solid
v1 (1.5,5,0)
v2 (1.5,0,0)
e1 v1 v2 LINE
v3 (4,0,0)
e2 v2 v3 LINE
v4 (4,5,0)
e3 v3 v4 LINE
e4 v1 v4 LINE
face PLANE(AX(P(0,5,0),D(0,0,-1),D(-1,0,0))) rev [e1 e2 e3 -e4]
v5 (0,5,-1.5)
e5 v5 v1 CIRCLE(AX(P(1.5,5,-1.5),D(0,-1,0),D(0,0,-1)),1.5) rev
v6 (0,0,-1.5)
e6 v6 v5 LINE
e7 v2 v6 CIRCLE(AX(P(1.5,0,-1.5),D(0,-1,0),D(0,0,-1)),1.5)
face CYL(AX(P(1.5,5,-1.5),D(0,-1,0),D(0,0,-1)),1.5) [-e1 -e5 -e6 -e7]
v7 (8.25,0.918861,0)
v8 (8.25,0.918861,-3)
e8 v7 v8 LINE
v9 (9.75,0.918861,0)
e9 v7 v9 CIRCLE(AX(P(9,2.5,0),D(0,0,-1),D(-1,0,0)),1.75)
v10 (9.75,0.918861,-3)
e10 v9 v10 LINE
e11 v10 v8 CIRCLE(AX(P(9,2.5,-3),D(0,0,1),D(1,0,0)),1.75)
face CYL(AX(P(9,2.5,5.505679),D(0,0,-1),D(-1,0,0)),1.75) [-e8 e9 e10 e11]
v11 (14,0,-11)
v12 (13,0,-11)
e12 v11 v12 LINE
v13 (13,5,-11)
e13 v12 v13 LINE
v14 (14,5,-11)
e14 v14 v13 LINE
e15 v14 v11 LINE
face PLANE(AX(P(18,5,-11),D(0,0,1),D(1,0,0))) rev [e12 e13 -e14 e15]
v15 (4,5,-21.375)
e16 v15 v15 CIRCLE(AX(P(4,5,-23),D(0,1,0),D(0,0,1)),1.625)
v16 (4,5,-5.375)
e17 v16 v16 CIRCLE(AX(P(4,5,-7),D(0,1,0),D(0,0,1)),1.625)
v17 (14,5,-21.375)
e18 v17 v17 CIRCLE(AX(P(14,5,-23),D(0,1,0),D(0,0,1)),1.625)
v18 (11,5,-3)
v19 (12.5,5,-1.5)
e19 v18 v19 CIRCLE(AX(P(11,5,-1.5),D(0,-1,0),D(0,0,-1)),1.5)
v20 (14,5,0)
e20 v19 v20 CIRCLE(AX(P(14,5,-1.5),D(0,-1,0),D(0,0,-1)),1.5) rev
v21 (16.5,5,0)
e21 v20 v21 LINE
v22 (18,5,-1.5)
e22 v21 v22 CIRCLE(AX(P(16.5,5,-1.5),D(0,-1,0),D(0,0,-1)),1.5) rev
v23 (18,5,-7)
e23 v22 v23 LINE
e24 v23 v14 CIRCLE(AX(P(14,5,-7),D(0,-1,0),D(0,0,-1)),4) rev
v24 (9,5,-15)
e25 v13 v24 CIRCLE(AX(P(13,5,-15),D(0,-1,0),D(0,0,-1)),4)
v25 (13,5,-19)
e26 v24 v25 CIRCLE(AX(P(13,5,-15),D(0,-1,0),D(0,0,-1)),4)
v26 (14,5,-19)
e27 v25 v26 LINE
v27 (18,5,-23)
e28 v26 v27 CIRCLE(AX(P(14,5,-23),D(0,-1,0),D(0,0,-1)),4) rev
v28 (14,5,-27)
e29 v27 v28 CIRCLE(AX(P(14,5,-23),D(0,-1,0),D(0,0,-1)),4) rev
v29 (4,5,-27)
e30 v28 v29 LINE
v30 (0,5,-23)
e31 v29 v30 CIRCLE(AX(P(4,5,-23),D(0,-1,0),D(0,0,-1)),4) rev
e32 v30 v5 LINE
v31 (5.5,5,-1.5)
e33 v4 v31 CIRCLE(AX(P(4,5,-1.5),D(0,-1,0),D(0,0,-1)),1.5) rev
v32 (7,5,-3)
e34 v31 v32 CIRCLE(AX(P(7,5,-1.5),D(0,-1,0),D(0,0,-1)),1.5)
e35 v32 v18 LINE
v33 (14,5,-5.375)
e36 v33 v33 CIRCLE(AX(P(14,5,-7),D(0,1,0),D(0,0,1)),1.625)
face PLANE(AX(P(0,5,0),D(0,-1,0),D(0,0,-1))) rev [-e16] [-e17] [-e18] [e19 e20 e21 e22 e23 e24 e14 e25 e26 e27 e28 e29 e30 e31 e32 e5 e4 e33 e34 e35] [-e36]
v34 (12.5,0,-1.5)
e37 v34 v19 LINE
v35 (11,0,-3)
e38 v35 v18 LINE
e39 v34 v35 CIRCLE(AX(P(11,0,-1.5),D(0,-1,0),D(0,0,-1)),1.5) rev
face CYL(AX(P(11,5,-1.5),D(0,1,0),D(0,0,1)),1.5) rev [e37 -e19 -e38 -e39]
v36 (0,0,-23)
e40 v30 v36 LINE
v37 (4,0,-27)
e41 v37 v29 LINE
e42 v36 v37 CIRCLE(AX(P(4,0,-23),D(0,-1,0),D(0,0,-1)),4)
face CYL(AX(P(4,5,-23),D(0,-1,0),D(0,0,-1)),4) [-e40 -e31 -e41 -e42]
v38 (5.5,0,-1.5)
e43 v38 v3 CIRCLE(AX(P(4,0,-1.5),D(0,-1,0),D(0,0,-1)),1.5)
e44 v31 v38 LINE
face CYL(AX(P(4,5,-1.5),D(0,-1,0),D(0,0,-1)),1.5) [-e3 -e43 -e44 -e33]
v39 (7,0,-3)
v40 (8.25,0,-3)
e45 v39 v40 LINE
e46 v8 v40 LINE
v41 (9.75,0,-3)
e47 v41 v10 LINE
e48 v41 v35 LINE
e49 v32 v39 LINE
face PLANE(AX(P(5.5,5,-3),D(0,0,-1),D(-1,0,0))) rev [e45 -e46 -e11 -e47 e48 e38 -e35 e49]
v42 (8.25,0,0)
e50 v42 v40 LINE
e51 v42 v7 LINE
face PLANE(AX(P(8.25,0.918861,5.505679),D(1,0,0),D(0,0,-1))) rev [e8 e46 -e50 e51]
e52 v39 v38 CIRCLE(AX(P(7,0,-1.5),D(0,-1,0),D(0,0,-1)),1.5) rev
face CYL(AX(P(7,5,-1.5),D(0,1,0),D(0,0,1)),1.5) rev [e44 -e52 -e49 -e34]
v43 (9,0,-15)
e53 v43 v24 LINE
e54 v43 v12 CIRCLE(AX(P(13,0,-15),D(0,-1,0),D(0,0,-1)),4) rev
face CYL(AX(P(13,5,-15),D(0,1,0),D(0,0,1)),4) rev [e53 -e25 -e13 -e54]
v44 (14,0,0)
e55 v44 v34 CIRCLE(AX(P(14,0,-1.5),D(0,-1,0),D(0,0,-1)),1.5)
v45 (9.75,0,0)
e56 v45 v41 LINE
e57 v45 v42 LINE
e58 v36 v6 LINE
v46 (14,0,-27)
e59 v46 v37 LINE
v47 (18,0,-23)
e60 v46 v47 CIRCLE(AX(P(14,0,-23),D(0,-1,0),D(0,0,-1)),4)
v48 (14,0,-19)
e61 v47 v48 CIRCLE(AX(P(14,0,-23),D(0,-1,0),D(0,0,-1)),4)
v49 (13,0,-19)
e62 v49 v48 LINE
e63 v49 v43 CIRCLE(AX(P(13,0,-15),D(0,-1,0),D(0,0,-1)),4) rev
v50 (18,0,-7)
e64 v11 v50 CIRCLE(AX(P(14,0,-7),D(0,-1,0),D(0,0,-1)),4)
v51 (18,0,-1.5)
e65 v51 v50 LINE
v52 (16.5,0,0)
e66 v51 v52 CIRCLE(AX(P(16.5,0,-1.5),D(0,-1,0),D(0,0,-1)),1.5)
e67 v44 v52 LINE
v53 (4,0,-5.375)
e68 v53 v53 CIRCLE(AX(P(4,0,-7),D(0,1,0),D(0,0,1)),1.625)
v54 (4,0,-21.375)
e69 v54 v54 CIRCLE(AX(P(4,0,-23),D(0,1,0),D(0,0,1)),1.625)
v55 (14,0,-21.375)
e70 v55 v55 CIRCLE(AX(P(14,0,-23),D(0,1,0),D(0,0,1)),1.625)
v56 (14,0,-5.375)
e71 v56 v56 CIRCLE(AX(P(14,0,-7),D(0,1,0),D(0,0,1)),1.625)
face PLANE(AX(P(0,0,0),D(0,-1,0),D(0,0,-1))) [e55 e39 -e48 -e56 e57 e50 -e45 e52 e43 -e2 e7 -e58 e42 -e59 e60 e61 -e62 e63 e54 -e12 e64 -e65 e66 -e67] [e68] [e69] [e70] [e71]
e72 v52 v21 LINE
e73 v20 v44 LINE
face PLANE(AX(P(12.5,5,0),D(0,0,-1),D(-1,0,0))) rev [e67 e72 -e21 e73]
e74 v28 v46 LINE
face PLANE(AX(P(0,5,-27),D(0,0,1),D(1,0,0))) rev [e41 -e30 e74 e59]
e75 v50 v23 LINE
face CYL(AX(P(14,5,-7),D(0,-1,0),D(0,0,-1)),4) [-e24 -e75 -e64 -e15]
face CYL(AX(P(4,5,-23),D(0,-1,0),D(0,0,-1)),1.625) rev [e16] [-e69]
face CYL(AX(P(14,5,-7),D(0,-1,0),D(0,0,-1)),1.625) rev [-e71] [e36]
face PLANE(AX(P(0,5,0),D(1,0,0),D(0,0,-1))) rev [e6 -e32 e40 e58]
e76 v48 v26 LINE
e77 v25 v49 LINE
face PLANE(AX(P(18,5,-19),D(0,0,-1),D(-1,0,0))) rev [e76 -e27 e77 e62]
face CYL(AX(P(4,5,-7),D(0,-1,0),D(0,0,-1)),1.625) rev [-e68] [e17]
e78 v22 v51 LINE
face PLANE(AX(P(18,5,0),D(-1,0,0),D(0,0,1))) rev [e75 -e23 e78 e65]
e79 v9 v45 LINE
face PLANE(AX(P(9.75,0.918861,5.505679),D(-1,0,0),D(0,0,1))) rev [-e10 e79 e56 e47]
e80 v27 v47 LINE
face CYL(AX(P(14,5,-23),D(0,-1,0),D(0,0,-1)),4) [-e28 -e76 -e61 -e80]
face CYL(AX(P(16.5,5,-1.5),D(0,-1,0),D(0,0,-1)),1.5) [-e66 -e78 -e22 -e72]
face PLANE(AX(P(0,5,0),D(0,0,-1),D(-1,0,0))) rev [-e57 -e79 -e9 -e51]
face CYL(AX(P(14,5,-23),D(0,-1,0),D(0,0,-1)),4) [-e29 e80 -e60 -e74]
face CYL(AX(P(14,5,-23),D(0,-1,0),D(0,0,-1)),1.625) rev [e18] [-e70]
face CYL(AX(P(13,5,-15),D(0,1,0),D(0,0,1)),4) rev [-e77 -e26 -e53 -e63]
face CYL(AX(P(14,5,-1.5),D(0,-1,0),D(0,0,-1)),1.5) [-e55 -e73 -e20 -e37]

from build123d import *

# Parameters (mm, degrees)
SKETCH1_R           = 1.625
BOSS_EXTRUDE1_DEPTH = 5
FILLET1_R           = 4
FILLET3_R           = 1.5
BOSS_EXTRUDE2_DEPTH = 3


with BuildPart() as part:
    # Sketch1 → Boss-Extrude1 (new body)
    with BuildSketch(Plane(origin=(0, 0, 0), x_dir=(1, 0, 0), z_dir=(0, 1, 0))):
        Polygon((0, 0), (5.5, 0), (5.5, 3), (12.5, 3), (12.5, 0), (18, 0), (18, 11), (9, 11), (9, 19), (18, 19), (18, 27), (0, 27), align=None)
        with Locations(Location((4, 23, 0), (0, 0, 270))):
            Circle(SKETCH1_R, mode=Mode.SUBTRACT)
        with Locations(Location((14, 23, 0), (0, 0, 270))):
            Circle(SKETCH1_R, mode=Mode.SUBTRACT)
        with Locations(Location((14, 7, 0), (0, 0, 270))):
            Circle(SKETCH1_R, mode=Mode.SUBTRACT)
        with Locations(Location((4, 7, 0), (0, 0, 270))):
            Circle(SKETCH1_R, mode=Mode.SUBTRACT)
    extrude(amount=BOSS_EXTRUDE1_DEPTH)

    # Fillet1
    fillet1_edges = [part.edges().sort_by_distance(p)[0] for p in [
        (9, 2.5, -11),
        (9, 2.5, -19),
        (18, 2.5, -11),
        (0, 2.5, -27),
        (18, 2.5, -27),
        (18, 2.5, -19),
    ]]
    fillet(fillet1_edges, radius=FILLET1_R - 0.0001)  # a hair under: the kernel refuses the full size

    # Fillet3
    fillet3_edges = [part.edges().sort_by_distance(p)[0] for p in [
        (12.5, 2.5, -3),
        (18, 2.5, 0),
        (12.5, 2.5, 0),
        (5.5, 2.5, -3),
        (5.5, 2.5, 0),
        (0, 2.5, 0),
    ]]
    fillet(fillet3_edges, radius=FILLET3_R - 0.0001)  # a hair under: the kernel refuses the full size

    # Sketch3 → Boss-Extrude2 (add)
    with BuildSketch(Plane.XY.offset(-3)):
        with BuildLine():
            Line((8.25, 0.91886117), (8.25, 0))
            Line((8.25, 0), (9.75, 0))
            Line((9.75, 0), (9.75, 0.91886117))
            ThreePointArc((9.75, 0.91886117), (9, 4.25), (8.25, 0.91886117))
        make_face()
    extrude(amount=BOSS_EXTRUDE2_DEPTH)


solid = part.part
